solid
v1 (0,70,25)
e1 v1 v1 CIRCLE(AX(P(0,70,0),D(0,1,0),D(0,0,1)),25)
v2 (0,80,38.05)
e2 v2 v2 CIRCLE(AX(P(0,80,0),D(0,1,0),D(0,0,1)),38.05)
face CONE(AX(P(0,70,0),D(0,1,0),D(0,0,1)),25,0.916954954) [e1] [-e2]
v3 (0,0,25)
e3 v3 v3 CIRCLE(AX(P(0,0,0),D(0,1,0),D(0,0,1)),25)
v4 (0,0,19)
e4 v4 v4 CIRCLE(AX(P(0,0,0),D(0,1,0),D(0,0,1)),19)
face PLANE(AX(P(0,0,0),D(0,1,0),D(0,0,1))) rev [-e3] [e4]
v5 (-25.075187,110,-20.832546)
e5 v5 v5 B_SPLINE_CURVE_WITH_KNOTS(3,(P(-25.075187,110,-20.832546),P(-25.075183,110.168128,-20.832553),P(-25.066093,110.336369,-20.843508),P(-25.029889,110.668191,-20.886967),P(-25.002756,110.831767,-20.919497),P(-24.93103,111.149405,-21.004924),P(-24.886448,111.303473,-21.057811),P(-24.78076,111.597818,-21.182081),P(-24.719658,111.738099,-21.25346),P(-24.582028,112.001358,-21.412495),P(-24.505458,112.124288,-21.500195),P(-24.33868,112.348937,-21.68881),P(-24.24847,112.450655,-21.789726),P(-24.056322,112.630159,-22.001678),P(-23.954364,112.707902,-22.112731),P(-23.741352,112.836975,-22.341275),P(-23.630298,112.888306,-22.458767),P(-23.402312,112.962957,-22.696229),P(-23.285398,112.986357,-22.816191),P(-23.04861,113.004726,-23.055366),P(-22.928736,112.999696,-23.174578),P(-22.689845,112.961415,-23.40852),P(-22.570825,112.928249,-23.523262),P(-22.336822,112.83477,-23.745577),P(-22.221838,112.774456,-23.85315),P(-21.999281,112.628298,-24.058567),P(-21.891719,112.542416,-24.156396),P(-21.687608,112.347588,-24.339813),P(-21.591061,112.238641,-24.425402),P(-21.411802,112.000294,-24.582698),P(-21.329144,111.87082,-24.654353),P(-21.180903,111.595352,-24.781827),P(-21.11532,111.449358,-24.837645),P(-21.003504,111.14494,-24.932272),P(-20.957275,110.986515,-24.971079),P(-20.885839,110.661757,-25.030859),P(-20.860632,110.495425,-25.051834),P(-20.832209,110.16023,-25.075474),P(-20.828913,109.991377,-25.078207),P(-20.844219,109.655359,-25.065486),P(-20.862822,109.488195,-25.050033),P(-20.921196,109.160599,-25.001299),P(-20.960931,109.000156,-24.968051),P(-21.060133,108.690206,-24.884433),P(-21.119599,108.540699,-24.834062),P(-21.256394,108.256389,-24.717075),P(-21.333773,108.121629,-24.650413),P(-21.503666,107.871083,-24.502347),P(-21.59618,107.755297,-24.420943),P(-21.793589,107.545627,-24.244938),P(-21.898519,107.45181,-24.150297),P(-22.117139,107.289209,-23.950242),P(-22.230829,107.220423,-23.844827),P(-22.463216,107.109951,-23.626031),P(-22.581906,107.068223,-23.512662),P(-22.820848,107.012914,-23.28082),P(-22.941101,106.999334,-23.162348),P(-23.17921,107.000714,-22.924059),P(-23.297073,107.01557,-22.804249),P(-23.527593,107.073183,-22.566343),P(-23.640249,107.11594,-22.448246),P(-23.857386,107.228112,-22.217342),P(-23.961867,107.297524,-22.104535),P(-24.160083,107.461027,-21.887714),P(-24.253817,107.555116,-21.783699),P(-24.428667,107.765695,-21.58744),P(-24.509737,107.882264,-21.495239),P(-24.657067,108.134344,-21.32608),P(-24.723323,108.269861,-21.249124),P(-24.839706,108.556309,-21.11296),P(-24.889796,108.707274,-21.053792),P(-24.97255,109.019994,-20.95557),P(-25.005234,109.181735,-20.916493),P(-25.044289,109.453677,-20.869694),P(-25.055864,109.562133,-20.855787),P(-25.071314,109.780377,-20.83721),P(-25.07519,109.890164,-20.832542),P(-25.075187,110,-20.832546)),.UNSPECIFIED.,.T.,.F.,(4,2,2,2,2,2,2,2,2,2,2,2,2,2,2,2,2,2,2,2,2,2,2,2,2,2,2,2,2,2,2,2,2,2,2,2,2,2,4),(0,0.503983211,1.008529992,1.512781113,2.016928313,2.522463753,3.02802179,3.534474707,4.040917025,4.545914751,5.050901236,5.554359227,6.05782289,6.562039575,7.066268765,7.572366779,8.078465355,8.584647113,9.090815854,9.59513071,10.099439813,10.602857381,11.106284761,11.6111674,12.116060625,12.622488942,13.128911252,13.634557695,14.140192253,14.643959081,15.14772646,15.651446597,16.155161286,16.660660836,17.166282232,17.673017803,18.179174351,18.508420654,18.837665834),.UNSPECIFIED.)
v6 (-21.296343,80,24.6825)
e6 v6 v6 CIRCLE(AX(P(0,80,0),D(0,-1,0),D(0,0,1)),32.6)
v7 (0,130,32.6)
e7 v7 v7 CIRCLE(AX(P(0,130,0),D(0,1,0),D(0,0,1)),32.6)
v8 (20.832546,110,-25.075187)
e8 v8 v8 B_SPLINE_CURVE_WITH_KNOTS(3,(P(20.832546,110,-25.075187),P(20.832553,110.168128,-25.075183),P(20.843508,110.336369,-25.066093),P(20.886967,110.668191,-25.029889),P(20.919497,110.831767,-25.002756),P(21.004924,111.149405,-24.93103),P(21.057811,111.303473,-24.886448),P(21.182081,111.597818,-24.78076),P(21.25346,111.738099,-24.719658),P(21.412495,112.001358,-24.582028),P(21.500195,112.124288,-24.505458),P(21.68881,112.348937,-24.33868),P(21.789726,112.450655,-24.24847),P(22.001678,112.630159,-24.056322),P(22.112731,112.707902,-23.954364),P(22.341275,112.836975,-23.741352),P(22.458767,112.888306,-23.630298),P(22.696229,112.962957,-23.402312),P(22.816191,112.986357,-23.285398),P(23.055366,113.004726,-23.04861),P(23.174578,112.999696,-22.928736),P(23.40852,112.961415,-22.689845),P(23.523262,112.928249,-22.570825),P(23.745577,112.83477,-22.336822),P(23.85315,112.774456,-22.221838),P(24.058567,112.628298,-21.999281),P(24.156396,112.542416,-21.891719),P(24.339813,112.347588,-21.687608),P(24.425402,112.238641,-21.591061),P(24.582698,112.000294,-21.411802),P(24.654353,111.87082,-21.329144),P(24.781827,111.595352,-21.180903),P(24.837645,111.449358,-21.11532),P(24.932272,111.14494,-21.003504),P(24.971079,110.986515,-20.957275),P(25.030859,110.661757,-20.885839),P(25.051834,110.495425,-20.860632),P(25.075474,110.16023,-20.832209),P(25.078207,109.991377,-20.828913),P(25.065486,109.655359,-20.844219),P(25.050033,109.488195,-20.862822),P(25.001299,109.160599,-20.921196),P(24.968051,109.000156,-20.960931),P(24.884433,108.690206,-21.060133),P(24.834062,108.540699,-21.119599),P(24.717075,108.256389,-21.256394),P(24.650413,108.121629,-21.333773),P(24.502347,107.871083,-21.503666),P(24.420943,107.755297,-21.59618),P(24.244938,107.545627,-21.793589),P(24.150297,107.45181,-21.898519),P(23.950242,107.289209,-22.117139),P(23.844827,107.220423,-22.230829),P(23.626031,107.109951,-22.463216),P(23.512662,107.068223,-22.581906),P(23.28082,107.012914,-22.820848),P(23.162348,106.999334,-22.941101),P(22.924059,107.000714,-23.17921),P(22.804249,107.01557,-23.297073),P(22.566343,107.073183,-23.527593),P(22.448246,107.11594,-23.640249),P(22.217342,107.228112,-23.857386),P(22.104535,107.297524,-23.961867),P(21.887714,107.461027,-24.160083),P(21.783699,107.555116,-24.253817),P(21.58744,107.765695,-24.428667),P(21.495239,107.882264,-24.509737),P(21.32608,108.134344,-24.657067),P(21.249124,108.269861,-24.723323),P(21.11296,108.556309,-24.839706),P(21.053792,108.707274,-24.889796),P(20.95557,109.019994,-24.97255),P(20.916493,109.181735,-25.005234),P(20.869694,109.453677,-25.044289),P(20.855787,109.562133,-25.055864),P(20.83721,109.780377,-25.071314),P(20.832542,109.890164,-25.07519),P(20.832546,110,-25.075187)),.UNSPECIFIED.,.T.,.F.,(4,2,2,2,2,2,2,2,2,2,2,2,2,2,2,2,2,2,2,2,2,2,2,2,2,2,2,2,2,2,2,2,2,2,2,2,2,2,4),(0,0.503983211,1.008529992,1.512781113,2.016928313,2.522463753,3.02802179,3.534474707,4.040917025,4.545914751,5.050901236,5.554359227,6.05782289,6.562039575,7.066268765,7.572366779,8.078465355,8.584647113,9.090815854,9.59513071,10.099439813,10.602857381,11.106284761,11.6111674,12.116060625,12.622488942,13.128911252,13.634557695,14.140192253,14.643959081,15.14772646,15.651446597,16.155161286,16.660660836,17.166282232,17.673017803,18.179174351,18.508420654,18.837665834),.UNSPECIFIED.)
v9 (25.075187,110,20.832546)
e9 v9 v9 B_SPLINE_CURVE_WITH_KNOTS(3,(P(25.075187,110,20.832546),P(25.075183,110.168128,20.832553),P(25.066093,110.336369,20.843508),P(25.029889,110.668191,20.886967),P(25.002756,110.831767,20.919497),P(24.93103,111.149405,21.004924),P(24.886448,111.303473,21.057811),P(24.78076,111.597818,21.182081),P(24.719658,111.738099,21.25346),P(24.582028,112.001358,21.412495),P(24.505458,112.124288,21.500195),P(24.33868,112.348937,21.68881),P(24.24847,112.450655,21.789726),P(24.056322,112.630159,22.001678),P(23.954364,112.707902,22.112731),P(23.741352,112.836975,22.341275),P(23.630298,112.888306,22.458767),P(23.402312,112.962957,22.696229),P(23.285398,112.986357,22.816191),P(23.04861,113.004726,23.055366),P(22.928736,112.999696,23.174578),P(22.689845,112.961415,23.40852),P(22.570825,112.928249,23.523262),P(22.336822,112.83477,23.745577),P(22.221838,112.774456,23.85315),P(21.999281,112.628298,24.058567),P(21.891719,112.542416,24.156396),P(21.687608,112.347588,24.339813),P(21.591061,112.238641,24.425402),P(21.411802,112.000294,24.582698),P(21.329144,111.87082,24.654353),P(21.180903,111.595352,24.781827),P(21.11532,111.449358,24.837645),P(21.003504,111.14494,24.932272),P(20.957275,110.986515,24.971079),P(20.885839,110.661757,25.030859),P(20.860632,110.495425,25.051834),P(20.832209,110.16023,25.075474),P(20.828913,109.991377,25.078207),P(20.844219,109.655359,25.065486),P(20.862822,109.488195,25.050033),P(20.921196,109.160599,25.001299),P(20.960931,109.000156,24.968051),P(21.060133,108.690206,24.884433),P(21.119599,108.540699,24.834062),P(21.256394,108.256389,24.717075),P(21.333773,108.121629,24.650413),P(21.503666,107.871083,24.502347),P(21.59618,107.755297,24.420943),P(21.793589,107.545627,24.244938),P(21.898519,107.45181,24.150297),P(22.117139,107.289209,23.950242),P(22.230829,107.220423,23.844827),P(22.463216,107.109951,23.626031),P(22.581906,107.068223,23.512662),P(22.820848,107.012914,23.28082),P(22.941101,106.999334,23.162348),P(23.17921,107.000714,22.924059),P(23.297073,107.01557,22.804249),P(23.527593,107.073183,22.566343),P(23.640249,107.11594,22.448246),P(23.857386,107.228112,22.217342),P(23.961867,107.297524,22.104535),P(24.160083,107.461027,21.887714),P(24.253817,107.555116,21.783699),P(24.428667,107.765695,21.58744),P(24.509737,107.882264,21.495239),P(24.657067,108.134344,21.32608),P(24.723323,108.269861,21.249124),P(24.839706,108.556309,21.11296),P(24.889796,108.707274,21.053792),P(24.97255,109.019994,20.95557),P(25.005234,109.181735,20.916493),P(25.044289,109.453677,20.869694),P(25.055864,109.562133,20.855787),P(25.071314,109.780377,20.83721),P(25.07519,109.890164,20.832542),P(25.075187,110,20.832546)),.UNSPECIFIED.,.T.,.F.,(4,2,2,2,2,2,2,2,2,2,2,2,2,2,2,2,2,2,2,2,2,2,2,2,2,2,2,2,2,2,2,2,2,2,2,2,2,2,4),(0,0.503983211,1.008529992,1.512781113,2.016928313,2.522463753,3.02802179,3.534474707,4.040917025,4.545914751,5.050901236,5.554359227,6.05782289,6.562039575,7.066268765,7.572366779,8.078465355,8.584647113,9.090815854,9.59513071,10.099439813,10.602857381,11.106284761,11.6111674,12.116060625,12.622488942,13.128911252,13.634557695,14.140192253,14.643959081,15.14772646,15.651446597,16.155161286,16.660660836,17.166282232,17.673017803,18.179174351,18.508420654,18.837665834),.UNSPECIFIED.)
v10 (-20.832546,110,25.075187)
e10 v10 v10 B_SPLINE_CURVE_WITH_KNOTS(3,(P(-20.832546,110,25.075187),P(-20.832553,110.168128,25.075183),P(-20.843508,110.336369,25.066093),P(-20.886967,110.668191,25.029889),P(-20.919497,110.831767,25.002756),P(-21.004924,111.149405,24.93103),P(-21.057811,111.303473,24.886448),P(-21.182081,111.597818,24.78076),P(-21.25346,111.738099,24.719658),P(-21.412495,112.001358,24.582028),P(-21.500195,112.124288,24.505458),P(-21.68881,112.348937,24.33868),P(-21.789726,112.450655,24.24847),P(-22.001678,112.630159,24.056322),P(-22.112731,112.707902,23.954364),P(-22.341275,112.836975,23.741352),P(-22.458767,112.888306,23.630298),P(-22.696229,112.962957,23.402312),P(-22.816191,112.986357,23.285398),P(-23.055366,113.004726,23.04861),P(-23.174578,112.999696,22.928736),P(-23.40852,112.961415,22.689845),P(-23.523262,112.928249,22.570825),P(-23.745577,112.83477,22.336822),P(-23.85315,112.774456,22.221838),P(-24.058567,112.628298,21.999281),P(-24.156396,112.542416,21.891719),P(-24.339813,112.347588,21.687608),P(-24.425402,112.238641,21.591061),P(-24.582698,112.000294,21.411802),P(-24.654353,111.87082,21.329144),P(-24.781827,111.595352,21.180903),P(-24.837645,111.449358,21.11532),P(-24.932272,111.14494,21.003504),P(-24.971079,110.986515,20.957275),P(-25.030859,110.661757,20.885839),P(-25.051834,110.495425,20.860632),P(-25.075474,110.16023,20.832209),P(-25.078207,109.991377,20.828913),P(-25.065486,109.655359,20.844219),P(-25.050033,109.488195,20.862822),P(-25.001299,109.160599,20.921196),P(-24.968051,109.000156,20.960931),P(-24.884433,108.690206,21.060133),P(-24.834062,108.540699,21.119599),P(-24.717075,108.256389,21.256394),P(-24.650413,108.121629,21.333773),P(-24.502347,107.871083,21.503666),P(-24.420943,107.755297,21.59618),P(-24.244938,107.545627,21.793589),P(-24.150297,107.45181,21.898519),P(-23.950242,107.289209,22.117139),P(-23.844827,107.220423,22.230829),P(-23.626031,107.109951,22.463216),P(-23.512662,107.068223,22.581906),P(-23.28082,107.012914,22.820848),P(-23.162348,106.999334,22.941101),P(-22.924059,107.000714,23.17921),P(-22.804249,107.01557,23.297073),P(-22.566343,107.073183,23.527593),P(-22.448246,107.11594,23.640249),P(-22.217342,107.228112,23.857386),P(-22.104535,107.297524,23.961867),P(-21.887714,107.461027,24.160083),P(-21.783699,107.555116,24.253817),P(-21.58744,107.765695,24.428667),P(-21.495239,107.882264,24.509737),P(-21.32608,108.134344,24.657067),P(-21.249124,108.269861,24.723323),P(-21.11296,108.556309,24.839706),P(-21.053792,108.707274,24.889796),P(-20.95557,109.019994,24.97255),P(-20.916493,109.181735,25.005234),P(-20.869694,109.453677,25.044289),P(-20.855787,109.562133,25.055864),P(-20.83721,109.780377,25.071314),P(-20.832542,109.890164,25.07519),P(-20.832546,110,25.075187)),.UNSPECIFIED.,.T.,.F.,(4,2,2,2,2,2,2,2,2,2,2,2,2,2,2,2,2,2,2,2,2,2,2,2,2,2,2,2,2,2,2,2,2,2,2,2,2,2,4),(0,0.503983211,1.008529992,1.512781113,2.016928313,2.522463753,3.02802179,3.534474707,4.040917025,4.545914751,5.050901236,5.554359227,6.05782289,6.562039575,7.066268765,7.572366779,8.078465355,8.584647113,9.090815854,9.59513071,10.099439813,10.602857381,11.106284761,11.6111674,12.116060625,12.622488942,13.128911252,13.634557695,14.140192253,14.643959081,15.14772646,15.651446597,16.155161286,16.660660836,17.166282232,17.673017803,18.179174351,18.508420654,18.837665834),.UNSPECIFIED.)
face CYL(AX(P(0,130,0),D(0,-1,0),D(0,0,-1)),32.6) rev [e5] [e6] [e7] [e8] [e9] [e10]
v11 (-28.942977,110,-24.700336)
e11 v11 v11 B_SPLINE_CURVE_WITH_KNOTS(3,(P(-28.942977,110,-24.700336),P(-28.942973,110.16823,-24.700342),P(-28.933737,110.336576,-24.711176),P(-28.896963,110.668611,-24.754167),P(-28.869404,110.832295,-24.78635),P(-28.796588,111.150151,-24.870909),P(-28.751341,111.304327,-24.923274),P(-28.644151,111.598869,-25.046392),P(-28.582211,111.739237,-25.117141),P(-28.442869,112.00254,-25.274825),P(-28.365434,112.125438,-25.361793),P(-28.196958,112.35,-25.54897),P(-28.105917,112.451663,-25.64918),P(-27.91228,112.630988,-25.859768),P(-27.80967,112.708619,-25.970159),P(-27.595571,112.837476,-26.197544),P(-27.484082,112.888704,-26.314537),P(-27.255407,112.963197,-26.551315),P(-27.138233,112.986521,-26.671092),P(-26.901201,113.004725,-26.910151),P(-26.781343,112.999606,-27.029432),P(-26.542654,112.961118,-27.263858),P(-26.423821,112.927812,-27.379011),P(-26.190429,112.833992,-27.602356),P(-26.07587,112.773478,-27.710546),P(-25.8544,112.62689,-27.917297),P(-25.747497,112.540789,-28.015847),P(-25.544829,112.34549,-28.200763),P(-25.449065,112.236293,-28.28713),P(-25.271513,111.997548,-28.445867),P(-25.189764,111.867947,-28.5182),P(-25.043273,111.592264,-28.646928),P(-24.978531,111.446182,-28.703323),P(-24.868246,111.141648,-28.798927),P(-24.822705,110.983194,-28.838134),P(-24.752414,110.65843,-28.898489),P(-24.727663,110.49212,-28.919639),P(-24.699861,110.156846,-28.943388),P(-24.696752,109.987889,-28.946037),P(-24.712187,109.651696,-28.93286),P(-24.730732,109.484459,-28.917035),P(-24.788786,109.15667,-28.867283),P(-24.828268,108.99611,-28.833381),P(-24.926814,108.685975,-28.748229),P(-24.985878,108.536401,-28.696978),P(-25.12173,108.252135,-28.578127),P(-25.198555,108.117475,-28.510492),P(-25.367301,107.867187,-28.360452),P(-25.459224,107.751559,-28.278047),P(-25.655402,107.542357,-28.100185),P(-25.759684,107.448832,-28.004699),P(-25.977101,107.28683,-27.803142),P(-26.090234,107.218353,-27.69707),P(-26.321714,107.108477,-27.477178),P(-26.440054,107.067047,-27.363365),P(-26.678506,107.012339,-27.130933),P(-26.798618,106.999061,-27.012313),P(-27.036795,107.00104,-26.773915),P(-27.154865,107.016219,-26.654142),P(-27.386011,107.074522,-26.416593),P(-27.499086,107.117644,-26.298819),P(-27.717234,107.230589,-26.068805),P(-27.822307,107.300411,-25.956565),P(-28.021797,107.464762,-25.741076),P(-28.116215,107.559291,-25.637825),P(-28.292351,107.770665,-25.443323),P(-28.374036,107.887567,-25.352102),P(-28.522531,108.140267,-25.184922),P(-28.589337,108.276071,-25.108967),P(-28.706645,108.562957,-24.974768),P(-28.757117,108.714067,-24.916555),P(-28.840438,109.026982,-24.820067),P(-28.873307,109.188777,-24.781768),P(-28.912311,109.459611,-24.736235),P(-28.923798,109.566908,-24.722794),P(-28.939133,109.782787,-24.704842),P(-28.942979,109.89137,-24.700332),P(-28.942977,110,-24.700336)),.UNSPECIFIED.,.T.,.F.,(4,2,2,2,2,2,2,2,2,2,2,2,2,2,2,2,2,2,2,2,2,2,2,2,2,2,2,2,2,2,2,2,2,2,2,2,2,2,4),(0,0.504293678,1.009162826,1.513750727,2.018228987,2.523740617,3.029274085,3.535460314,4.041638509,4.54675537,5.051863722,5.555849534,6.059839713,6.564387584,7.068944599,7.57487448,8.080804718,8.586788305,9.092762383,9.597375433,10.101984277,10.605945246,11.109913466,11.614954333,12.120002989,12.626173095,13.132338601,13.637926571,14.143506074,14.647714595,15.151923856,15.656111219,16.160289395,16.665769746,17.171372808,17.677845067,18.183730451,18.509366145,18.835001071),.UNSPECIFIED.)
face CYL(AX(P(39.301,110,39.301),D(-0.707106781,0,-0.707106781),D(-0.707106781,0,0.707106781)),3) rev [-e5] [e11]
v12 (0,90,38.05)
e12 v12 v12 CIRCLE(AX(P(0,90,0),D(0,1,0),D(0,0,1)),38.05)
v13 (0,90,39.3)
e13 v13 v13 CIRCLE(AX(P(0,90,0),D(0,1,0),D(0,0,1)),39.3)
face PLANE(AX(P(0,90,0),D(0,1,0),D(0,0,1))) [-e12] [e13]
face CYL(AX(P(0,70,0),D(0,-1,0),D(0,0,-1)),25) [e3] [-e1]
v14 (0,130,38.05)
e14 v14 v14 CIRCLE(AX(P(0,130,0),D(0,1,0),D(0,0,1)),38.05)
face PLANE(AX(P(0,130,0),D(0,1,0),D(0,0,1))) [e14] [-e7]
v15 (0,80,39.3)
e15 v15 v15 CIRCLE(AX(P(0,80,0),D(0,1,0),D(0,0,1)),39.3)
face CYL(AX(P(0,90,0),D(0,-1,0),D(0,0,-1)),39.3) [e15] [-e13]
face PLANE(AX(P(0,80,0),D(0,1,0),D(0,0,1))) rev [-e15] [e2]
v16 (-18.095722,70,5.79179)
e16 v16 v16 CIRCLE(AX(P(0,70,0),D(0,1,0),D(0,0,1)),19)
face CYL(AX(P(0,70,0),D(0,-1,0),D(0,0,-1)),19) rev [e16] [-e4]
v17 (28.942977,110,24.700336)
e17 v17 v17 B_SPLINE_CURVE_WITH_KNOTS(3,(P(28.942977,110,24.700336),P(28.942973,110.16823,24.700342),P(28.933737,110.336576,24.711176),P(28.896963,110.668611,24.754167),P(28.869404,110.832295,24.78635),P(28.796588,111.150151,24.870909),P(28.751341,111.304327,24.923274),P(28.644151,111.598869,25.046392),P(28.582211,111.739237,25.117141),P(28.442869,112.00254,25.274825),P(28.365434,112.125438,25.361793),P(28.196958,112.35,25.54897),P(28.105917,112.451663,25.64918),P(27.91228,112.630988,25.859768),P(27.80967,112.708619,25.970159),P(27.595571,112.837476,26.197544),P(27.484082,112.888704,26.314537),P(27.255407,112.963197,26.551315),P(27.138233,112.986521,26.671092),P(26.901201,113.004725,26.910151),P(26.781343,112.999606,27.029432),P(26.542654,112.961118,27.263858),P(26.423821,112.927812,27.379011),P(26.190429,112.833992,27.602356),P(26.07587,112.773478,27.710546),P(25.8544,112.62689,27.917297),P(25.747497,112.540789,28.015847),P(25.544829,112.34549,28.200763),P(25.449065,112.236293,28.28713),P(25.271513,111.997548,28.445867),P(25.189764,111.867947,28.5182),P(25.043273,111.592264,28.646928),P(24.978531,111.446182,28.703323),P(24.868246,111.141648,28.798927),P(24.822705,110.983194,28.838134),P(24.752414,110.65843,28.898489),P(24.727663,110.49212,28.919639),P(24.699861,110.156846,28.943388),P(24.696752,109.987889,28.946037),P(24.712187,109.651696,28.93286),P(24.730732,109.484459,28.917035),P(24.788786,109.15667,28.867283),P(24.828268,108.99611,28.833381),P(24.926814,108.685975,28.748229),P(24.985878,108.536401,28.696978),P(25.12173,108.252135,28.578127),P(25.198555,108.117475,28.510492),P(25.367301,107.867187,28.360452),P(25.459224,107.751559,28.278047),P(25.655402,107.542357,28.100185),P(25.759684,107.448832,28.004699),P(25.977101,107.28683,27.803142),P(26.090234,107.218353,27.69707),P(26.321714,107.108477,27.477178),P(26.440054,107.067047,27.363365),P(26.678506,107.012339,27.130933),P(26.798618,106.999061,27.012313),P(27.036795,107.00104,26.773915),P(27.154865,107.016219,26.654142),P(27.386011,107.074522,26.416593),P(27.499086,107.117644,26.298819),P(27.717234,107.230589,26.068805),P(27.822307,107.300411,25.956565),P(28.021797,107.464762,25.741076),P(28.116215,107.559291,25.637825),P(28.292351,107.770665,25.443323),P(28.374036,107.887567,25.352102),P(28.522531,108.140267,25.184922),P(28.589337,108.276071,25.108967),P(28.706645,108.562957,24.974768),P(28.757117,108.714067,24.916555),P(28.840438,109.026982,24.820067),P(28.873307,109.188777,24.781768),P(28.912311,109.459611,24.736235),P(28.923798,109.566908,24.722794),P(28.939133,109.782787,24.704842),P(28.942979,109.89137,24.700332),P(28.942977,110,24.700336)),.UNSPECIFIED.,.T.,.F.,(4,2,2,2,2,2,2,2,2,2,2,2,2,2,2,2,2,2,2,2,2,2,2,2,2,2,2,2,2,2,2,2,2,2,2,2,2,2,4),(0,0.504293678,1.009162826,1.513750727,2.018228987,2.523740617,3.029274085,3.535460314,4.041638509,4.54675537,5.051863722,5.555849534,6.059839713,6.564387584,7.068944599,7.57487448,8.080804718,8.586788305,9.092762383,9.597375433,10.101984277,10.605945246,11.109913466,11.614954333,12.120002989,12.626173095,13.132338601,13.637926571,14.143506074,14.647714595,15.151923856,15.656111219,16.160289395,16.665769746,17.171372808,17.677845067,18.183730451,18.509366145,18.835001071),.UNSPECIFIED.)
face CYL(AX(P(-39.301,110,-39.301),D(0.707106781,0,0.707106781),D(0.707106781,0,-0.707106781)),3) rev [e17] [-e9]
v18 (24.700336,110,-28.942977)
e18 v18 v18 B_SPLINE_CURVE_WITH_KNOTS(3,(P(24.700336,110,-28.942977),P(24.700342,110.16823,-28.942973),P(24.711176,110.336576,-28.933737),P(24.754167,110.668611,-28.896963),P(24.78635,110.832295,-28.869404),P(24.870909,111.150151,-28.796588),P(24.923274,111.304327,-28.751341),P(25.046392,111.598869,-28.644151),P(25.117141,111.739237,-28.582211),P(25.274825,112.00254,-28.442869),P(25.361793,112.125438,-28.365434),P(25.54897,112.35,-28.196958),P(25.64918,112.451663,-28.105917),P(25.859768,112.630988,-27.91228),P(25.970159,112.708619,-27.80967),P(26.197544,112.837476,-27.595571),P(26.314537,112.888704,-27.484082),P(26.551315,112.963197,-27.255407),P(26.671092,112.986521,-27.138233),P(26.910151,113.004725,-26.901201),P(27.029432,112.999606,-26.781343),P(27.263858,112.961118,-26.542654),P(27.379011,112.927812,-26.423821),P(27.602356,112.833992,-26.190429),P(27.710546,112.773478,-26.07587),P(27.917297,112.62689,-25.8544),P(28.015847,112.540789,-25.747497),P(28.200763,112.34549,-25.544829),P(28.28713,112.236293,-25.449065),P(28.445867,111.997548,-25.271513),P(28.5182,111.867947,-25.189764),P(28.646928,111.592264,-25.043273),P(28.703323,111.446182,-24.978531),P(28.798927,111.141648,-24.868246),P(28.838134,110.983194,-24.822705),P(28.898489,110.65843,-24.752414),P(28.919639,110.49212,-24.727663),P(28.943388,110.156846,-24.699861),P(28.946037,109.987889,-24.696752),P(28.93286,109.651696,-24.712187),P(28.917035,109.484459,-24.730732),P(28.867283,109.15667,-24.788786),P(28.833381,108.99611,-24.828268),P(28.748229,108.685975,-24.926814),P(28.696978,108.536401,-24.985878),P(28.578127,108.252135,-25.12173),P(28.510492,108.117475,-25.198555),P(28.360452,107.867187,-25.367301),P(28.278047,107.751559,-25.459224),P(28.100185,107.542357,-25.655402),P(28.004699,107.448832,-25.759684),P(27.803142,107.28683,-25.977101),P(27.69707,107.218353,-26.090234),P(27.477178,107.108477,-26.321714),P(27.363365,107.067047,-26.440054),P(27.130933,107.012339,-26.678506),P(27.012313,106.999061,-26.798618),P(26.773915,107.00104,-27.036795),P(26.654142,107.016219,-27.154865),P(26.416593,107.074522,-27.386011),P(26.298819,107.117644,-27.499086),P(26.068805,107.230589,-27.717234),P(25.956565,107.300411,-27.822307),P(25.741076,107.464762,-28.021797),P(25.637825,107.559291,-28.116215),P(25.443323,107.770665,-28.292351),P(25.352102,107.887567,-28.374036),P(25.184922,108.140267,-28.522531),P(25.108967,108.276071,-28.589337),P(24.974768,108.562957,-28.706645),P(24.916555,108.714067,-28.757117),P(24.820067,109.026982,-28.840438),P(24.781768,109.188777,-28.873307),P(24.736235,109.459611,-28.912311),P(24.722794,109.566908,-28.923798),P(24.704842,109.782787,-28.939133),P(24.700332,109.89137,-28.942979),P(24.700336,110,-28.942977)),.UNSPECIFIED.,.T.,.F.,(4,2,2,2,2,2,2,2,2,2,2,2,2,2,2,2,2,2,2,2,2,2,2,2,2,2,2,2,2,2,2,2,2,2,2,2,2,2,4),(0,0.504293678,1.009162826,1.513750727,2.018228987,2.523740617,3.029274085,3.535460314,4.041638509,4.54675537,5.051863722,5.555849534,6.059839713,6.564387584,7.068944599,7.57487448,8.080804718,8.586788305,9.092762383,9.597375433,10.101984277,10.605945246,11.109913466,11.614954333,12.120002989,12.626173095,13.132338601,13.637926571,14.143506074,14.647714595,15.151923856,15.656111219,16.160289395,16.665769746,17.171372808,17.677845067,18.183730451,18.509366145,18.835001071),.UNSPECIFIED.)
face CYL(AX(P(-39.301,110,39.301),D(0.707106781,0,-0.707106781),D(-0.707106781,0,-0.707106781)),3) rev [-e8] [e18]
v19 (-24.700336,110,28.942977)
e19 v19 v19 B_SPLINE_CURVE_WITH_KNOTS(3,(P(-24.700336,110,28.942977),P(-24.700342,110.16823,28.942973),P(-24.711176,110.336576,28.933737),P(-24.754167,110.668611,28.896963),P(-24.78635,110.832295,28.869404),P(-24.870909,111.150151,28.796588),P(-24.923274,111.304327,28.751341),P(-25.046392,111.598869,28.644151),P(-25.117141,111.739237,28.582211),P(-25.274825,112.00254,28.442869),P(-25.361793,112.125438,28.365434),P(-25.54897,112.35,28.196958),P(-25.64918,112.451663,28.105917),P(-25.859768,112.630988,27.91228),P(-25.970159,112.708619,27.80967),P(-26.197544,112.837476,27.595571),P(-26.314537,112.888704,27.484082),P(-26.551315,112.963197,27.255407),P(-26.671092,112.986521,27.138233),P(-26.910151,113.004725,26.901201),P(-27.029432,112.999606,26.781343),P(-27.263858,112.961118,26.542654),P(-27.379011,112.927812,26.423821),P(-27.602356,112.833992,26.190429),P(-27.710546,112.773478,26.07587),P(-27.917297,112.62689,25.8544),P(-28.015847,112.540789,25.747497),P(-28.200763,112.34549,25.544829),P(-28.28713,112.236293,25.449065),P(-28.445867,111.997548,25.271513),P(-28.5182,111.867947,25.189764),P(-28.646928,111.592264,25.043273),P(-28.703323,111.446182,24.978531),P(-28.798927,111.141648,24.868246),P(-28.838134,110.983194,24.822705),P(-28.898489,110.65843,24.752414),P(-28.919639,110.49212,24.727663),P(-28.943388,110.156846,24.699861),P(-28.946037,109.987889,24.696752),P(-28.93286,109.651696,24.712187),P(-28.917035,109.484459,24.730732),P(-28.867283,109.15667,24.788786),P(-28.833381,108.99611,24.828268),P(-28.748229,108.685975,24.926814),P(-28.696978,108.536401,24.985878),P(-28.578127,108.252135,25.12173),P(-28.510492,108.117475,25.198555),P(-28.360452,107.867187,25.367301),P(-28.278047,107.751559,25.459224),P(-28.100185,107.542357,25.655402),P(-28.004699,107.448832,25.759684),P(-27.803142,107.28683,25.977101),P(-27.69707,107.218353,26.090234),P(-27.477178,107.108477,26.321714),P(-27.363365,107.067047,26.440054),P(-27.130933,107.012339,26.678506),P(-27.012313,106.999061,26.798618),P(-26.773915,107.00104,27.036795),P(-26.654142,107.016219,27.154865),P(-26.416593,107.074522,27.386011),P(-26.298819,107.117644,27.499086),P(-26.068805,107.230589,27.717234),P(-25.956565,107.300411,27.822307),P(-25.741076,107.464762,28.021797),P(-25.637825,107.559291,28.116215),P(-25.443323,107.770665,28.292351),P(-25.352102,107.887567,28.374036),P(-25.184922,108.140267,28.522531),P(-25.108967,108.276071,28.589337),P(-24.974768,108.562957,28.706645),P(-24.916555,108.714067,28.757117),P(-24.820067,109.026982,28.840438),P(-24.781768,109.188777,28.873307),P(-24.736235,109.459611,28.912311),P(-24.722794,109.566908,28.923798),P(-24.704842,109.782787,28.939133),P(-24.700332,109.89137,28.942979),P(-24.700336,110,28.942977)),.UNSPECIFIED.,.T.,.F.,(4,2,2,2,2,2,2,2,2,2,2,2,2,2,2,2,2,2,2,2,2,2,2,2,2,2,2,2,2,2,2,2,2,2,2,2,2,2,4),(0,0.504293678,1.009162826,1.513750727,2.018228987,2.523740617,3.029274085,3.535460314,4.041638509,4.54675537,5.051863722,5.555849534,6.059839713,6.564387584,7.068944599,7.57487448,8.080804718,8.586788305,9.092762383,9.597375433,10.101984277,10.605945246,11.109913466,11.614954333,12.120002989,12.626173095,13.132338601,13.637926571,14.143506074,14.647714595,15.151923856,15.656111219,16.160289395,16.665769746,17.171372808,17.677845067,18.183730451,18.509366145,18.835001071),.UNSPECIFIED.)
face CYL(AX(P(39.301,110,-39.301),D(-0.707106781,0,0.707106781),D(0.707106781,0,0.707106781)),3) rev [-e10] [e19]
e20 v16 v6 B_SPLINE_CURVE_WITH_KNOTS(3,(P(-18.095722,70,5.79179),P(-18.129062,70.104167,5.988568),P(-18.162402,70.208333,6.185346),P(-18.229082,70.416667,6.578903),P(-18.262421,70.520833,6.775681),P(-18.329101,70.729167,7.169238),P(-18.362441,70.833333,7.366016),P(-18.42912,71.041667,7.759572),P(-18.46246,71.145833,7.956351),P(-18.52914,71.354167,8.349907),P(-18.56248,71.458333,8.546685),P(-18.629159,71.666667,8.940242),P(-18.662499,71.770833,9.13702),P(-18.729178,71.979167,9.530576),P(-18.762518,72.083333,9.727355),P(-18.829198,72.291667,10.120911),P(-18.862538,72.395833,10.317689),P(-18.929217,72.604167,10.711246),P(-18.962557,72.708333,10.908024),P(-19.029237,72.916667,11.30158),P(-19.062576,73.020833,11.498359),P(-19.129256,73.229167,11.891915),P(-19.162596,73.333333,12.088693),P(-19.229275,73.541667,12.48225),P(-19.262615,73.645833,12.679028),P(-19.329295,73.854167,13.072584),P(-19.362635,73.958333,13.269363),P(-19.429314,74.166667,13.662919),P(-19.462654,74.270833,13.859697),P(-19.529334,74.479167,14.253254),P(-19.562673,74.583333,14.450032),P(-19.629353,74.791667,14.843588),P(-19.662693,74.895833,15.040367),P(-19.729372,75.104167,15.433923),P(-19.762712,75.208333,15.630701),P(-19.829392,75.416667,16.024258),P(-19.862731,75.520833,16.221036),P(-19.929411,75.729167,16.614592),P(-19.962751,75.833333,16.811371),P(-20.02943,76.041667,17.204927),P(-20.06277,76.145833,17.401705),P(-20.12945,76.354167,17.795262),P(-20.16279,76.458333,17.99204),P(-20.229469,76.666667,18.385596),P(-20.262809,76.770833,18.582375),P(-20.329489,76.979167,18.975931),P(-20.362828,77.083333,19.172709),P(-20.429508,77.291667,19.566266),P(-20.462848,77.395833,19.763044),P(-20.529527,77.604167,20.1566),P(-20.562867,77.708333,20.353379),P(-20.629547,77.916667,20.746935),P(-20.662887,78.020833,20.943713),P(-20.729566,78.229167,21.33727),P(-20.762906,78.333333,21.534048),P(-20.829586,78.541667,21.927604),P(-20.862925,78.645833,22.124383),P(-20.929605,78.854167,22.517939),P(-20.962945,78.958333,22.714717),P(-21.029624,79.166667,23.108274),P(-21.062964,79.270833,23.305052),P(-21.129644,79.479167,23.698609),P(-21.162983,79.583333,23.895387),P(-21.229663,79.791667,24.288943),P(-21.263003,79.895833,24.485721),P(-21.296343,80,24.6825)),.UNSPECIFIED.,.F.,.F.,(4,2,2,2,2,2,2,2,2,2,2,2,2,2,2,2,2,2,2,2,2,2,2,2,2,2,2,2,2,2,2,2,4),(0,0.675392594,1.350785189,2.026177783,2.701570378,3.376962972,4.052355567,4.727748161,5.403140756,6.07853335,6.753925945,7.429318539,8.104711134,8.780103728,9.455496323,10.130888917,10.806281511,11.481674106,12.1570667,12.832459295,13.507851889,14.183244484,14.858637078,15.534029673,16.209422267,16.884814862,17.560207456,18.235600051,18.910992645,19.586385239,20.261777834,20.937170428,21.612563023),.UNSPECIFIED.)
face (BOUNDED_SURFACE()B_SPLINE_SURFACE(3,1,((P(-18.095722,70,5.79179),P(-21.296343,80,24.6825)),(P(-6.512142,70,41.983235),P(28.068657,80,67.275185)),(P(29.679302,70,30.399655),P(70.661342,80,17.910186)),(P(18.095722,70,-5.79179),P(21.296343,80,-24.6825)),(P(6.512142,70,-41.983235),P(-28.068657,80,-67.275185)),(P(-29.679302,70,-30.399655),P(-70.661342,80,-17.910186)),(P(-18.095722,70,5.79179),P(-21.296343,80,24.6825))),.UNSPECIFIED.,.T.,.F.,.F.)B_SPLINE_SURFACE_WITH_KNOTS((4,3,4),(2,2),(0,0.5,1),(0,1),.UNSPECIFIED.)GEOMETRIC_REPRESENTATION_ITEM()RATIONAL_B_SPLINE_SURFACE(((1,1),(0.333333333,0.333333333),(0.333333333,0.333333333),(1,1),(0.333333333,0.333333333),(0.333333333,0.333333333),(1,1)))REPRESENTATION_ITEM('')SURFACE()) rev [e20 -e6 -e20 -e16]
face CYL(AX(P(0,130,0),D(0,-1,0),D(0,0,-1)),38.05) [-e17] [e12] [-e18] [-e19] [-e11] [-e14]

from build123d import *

# Parameters (mm, degrees)
SKETCH2_R                 = 25
SKETCH2_R_2               = 19
BOSS_EXTRUDE1_DEPTH       = 70
BOSS_EXTRUDE2_START       = 10
SKETCH3_R                 = 38.05
SKETCH3_R_2               = 32.6
BOSS_EXTRUDE2_DEPTH       = 50
BOSS_EXTRUDE3_START       = -50
BOSS_EXTRUDE3_OUTLINE_R   = 39.3
BOSS_EXTRUDE3_OUTLINE_R_2 = 38.05
BOSS_EXTRUDE3_DEPTH       = 10
CUT_EXTRUDE1_REACH        = 162.207
CUT_EXTRUDE1_END_RADIUS   = 32.6
SKETCH7_R                 = 3
CIRPATTERN1_COUNT         = 4


with BuildPart() as part:
    # Sketch2 → Boss-Extrude1 (new body)
    with BuildSketch(Plane(origin=(0, 0, 0), x_dir=(1, 0, 0), z_dir=(0, 1, 0))):
        with Locations(Location((0, 0, 0), (0, 0, 270))):
            Circle(SKETCH2_R)
        with Locations(Location((0, 0, 0), (0, 0, 270))):
            Circle(SKETCH2_R_2, mode=Mode.SUBTRACT)
    extrude(amount=BOSS_EXTRUDE1_DEPTH)



with BuildPart() as body_2:
    # Sketch3 → Boss-Extrude2 (new body)
    with BuildSketch(Plane(origin=(0, 70, 0), x_dir=(1, 0, 0), z_dir=(0, 1, 0)).offset(BOSS_EXTRUDE2_START)):
        with Locations(Location((0, 0, 0), (0, 0, 270))):
            Circle(SKETCH3_R)
        with Locations(Location((0, 0, 0), (0, 0, 270))):
            Circle(SKETCH3_R_2, mode=Mode.SUBTRACT)
    extrude(amount=BOSS_EXTRUDE2_DEPTH)


with BuildPart() as part_1:
    add(part.part)

    add(body_2.part)  # loft3 joins it to this body
    # loft up to a face of the part (loft3)
    loft([Face(Wire([part_1.edges().sort_by_distance((18.224215686, 70, -17.113677648))[0]])), Face(Wire([part_1.edges().sort_by_distance((-27.737256273, 80, -26.047017381))[0]]))])

    # Cut-Loft1: read off the stored shape, not the designer's step
    # Cut-Loft1: loft between two sections, ruled curve by curve
    cut_loft1_from = [
        Edge.make_bspline([(-18.095722376, 70, 5.791790025), (-6.512142325, 70, 41.983234777), (29.679302426, 70, 30.399654727), (18.095722376, 70, -5.791790025), (6.512142325, 70, -41.983234777), (-29.679302426, 70, -30.399654727), (-18.095722376, 70, 5.791790025)], [0, 0, 0, 0, 0.5, 0.5, 0.5, 1, 1, 1, 1], 3, [1, 0.333333333, 0.333333333, 1, 0.333333333, 0.333333333, 1]),
    ]
    cut_loft1_to = [
        Edge.make_bspline([(-21.296342667, 80, 24.682499651), (28.068656636, 80, 67.275184984), (70.661341969, 80, 17.910185682), (21.296342667, 80, -24.682499651), (-28.068656636, 80, -67.275184984), (-70.661341969, 80, -17.910185682), (-21.296342667, 80, 24.682499651)], [0, 0, 0, 0, 0.5, 0.5, 0.5, 1, 1, 1, 1], 3, [1, 0.333333333, 0.333333333, 1, 0.333333333, 0.333333333, 1]),
    ]
    cut_loft1 = Solid(Shell([*[Face.make_surface_from_curves(cut_loft1_from[k], cut_loft1_to[k]) for k in range(1)], Face(Wire(cut_loft1_from)), Face(Wire(cut_loft1_to))]))
    add(cut_loft1, mode=Mode.SUBTRACT)

    # Boss-Extrude3: read off the stored shape, not the designer's step
    # Boss-Extrude3 outline → Boss-Extrude3 (add)
    with BuildSketch(Plane(origin=(0, 130, 0), x_dir=(1, 0, 0), z_dir=(0, 1, 0)).offset(BOSS_EXTRUDE3_START)):
        Circle(BOSS_EXTRUDE3_OUTLINE_R)
        Circle(BOSS_EXTRUDE3_OUTLINE_R_2, mode=Mode.SUBTRACT)
    extrude(amount=BOSS_EXTRUDE3_DEPTH)

    # Cut-Extrude1: up to this cylinder (the profile starts outside it)
    cut_extrude1_end = Plane(origin=(0, 110, 0), z_dir=(0, -1, 0)) * Cylinder(CUT_EXTRUDE1_END_RADIUS, 390.614, mode=Mode.PRIVATE)
    # Sketch7 → Cut-Extrude1 (cut, up to the surface)
    with BuildSketch(Plane(origin=(-26.905413024, 0, 26.905413024), x_dir=(0, -1, 0), z_dir=(-0.7071067811865488, 0, 0.7071067811865464)), mode=Mode.PRIVATE) as cut_extrude1_sk1:
        with Locations(Location((-110, 0, 0), (0, 0, 90))):
            Circle(SKETCH7_R)
    cut_extrude1_tool1 = extrude(cut_extrude1_sk1.sketch, amount=-CUT_EXTRUDE1_REACH, mode=Mode.PRIVATE) - cut_extrude1_end
    cut_extrude1 = cut_extrude1_tool1.solids().sort_by_distance((-26.905413, 110, 26.905413))[0]
    add(cut_extrude1, mode=Mode.SUBTRACT)

    # CirPattern1: Cut-Extrude1 ×4 about axis
    cirpattern1_axis = Axis((0, 130, 0), (0, -1, 0))
    for i in range(1, CIRPATTERN1_COUNT):
        add(cut_extrude1.rotate(cirpattern1_axis, i * 360 / CIRPATTERN1_COUNT), mode=Mode.SUBTRACT)


solid = part_1.part
